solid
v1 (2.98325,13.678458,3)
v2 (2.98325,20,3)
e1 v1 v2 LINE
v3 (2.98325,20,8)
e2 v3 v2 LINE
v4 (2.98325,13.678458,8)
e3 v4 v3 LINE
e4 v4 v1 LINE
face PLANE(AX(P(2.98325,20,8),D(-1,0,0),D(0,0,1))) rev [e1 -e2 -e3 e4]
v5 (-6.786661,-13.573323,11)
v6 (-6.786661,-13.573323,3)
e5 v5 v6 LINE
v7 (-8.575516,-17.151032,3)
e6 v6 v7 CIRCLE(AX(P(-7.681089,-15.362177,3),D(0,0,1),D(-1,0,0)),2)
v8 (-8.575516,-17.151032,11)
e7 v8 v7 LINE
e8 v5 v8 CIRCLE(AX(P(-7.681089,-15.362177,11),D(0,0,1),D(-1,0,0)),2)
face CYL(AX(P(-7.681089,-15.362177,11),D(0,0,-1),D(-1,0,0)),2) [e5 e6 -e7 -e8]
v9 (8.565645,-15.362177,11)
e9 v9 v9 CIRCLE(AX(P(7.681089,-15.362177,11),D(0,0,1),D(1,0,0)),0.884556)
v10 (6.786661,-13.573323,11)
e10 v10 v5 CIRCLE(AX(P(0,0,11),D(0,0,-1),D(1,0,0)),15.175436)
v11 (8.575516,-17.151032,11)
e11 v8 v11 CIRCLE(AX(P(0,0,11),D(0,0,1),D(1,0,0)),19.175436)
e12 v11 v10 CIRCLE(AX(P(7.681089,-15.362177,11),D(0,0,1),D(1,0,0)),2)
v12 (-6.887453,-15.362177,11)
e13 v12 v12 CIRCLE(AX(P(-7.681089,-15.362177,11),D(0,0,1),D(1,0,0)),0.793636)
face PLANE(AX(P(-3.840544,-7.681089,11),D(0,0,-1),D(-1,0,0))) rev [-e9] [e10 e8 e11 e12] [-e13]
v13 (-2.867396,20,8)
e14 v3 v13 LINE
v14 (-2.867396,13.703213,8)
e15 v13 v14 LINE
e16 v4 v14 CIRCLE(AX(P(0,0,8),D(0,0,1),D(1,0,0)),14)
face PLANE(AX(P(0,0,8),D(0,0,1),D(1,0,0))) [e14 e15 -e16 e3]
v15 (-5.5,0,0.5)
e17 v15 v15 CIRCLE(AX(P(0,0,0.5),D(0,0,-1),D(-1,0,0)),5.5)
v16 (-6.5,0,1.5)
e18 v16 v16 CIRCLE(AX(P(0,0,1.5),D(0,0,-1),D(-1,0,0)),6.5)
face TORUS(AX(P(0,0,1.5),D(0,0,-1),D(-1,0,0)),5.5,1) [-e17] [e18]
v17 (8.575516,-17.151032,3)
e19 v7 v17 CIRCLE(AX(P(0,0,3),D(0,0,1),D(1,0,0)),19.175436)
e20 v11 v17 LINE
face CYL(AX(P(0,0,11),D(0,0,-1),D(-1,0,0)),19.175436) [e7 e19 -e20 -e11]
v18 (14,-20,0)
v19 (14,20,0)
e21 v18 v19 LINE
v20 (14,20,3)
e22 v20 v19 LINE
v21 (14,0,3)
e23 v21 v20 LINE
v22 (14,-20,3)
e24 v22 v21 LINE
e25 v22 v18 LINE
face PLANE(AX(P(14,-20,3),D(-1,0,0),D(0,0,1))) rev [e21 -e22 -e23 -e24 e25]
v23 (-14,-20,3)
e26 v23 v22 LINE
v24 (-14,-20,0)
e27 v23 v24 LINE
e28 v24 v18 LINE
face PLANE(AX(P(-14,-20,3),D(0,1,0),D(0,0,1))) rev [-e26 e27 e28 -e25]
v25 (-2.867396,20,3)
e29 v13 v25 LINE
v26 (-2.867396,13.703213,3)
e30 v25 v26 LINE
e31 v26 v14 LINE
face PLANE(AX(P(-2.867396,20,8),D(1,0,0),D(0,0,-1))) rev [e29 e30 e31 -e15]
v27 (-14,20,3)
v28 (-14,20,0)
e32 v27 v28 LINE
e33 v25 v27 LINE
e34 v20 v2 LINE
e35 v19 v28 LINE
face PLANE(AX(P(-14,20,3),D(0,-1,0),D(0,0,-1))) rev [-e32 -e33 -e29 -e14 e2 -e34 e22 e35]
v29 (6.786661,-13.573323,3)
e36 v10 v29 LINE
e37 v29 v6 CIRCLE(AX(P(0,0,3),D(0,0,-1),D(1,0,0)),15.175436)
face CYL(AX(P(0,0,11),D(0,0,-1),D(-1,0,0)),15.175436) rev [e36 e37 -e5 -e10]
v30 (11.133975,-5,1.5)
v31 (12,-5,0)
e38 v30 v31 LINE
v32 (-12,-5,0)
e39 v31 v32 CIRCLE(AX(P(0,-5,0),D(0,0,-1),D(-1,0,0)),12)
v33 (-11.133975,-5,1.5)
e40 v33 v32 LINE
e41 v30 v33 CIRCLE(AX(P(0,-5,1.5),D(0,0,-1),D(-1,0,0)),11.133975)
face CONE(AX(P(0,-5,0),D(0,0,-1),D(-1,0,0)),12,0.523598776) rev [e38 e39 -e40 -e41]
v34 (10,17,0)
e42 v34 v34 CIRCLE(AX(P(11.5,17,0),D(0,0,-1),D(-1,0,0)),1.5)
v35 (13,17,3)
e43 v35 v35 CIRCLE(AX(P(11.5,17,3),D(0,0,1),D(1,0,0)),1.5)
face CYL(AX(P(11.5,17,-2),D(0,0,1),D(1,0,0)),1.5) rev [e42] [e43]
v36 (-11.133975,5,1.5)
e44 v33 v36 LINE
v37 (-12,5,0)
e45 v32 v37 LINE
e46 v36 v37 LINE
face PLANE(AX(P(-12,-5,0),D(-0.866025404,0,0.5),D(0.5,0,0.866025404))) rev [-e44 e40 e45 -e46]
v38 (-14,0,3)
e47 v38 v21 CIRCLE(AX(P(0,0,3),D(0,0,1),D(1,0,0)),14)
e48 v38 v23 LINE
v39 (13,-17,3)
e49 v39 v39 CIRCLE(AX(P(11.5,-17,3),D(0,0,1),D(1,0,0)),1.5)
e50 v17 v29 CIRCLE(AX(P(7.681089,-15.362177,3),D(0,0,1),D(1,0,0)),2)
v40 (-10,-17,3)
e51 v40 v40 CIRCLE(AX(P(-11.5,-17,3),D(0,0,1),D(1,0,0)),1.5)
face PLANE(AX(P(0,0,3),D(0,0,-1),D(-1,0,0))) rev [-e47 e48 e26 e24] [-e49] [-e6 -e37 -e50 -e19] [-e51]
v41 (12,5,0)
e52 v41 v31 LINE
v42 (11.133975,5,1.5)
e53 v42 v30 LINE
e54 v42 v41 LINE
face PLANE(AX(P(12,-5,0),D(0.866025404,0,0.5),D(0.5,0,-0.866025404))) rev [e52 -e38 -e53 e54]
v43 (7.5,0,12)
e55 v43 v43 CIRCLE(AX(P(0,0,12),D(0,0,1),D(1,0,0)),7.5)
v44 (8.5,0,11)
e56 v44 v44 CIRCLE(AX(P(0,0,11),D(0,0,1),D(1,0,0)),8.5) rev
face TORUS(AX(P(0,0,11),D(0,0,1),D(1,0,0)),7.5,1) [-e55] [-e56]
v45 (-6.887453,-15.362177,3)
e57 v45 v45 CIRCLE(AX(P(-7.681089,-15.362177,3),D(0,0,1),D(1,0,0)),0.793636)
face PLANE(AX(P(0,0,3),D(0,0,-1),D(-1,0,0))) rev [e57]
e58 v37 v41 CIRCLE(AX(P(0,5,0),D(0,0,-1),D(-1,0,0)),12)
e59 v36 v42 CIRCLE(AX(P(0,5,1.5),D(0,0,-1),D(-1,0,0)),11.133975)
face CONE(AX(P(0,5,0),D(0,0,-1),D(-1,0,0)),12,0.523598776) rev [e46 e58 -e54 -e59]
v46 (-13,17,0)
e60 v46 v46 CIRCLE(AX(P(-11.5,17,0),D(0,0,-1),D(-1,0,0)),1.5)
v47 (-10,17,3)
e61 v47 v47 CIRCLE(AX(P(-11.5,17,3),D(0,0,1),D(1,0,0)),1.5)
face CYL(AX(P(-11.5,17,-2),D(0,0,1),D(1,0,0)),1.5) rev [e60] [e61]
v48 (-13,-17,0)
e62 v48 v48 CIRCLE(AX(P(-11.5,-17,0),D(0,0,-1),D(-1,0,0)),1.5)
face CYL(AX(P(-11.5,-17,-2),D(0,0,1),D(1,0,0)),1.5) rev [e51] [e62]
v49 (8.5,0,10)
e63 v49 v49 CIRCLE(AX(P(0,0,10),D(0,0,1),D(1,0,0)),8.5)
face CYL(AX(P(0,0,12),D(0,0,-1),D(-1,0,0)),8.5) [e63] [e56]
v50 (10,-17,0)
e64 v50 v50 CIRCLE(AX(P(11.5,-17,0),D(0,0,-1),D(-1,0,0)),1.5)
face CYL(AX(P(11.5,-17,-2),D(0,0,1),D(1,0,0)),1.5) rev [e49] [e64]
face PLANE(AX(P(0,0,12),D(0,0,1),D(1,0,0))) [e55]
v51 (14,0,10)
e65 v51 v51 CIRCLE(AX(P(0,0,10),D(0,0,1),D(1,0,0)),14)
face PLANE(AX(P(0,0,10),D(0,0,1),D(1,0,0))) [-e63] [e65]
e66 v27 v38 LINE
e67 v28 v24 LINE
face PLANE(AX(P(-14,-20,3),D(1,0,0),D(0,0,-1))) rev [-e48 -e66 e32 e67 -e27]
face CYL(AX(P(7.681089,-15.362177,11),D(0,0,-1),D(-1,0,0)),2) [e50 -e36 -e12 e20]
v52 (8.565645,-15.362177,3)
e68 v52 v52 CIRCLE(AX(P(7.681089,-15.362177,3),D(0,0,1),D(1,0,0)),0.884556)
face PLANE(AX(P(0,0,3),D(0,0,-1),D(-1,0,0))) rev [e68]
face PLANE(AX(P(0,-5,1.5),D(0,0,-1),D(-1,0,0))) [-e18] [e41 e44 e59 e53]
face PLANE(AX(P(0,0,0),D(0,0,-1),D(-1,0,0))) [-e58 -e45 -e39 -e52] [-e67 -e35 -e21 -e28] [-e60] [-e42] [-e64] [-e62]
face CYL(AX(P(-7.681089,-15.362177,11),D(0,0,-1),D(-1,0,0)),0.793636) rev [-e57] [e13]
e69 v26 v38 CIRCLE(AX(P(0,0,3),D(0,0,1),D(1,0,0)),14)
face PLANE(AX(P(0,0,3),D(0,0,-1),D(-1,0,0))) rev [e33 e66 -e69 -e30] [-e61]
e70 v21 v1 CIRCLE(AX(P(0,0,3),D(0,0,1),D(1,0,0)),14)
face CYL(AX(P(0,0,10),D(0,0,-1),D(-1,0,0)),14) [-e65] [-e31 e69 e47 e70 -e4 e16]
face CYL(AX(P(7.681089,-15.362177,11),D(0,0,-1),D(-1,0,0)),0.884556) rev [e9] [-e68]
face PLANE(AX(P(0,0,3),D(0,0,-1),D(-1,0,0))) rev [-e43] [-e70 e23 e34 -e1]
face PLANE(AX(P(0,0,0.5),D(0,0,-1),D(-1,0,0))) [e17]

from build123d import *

# Parameters (mm, degrees)
SKETCH1_W           = 28
SKETCH1_H           = 40
BOSS_EXTRUDE1_DEPTH = 3
SKETCH2_R           = 14
BOSS_EXTRUDE2_DEPTH = 7
SKETCH3_R           = 8.5
BOSS_EXTRUDE3_DEPTH = 2
FILLET1_R           = 1
SKETCH4_R           = 0.884555984
SKETCH4_R_2         = 0.79363575
BOSS_EXTRUDE4_DEPTH = 8
SKETCH5_W           = 5.850646162
SKETCH5_H           = 7.111200286
BOSS_EXTRUDE5_DEPTH = 5
SKETCH6_R           = 1.5
CUT_EXTRUDE1_DEPTH  = 5
CUT_EXTRUDE2_DEPTH  = 1.5
CUT_EXTRUDE2_DRAFT  = -30
SKETCH8_R           = 6.5
BOSS_EXTRUDE6_DEPTH = 1
FILLET2_R           = 1


with BuildPart() as part:
    # Sketch1 → Boss-Extrude1 (new body)
    with BuildSketch(Plane.XY):
        Rectangle(SKETCH1_W, SKETCH1_H)
    extrude(amount=BOSS_EXTRUDE1_DEPTH)

    # Sketch2 → Boss-Extrude2 (add)
    with BuildSketch(Plane.XY.offset(3)):
        Circle(SKETCH2_R)
    extrude(amount=BOSS_EXTRUDE2_DEPTH)

    # Sketch3 → Boss-Extrude3 (add)
    with BuildSketch(Plane.XY.offset(10)):
        Circle(SKETCH3_R)
    extrude(amount=BOSS_EXTRUDE3_DEPTH)

    # Fillet1
    fillet1_edges = [part.edges().sort_by_distance(p)[0] for p in [
        (-8.5, 0, 12),
    ]]
    fillet(fillet1_edges, radius=FILLET1_R)

    # Sketch4 → Boss-Extrude4 (add)
    with BuildSketch(Plane.XY.offset(3)):
        with BuildLine():
            ThreePointArc((-8.575515757, -17.151031514), (0, -19.175436175), (8.575515757, -17.151031514))
            ThreePointArc((8.575515757, -17.151031514), (9.469942948, -14.467749941), (6.786661375, -13.57332275))
            ThreePointArc((6.786661375, -13.57332275), (0, -15.175436175), (-6.786661375, -13.57332275))
            ThreePointArc((-6.786661375, -13.57332275), (-9.469942948, -14.467749941), (-8.575515757, -17.151031514))
        make_face()
        with Locations((7.681088566, -15.362177132)):
            Circle(SKETCH4_R, mode=Mode.SUBTRACT)
        with Locations((-7.681088566, -15.362177132)):
            Circle(SKETCH4_R_2, mode=Mode.SUBTRACT)
    extrude(amount=BOSS_EXTRUDE4_DEPTH)

    # Sketch5 → Boss-Extrude5 (add)
    with BuildSketch(Plane.XY.offset(3)):
        with Locations((0.05792719, 16.444399857)):
            Rectangle(SKETCH5_W, SKETCH5_H)
    extrude(amount=BOSS_EXTRUDE5_DEPTH)

    # Sketch6 → Cut-Extrude1 (cut)
    with BuildSketch(Plane.XY.offset(3)):
        with Locations((-11.5, 17)):
            Circle(SKETCH6_R)
        with Locations((11.5, 17)):
            Circle(SKETCH6_R)
        with Locations((11.5, -17)):
            Circle(SKETCH6_R)
        with Locations((-11.5, -17)):
            Circle(SKETCH6_R)
    extrude(amount=-CUT_EXTRUDE1_DEPTH, mode=Mode.SUBTRACT)


with BuildPart() as cut_extrude2_tool:
    # Sketch7 → Cut-Extrude2 (with draft: the straight prism first)
    with BuildSketch(Plane(origin=(0, 0, 0), x_dir=(-1, 0, 0), z_dir=(0, 0, -1))):
        with BuildLine():
            ThreePointArc((-12, -5), (0, -17), (12, -5))
            Line((12, -5), (12, 5))
            ThreePointArc((12, 5), (0, 17), (-12, 5))
            Line((-12, 5), (-12, -5))
        make_face()
    extrude(amount=-CUT_EXTRUDE2_DEPTH)
    # Cut-Extrude2: the draft: its side faces are tilted about the plane it starts from
    cut_extrude2_sides = [cut_extrude2_tool.faces().sort_by_distance(p)[0] for p in [
        (-12, 0, 0.75),
        (0, 17, 0.75),
        (12, 0, 0.75),
        (0, -17, 0.75),
    ]]
    draft(cut_extrude2_sides, Plane(origin=(0, 0, 0), x_dir=(-1, 0, 0), z_dir=(0, 0, -1)), CUT_EXTRUDE2_DRAFT)


with BuildPart() as part_1:
    add(part.part)

    # Cut-Extrude2: cut by cut_extrude2_tool
    add(cut_extrude2_tool.part, mode=Mode.SUBTRACT)

    # Sketch8 → Boss-Extrude6 (add)
    with BuildSketch(Plane(origin=(0, 0, 1.5), x_dir=(-1, 0, 0), z_dir=(0, 0, -1))):
        Circle(SKETCH8_R)
    extrude(amount=BOSS_EXTRUDE6_DEPTH)

    # Fillet2
    fillet2_edges = [part_1.edges().sort_by_distance(p)[0] for p in [
        (6.5, 0, 0.5),
    ]]
    fillet(fillet2_edges, radius=FILLET2_R - 0.0001)  # a hair under: the kernel refuses the full size


solid = part_1.part
